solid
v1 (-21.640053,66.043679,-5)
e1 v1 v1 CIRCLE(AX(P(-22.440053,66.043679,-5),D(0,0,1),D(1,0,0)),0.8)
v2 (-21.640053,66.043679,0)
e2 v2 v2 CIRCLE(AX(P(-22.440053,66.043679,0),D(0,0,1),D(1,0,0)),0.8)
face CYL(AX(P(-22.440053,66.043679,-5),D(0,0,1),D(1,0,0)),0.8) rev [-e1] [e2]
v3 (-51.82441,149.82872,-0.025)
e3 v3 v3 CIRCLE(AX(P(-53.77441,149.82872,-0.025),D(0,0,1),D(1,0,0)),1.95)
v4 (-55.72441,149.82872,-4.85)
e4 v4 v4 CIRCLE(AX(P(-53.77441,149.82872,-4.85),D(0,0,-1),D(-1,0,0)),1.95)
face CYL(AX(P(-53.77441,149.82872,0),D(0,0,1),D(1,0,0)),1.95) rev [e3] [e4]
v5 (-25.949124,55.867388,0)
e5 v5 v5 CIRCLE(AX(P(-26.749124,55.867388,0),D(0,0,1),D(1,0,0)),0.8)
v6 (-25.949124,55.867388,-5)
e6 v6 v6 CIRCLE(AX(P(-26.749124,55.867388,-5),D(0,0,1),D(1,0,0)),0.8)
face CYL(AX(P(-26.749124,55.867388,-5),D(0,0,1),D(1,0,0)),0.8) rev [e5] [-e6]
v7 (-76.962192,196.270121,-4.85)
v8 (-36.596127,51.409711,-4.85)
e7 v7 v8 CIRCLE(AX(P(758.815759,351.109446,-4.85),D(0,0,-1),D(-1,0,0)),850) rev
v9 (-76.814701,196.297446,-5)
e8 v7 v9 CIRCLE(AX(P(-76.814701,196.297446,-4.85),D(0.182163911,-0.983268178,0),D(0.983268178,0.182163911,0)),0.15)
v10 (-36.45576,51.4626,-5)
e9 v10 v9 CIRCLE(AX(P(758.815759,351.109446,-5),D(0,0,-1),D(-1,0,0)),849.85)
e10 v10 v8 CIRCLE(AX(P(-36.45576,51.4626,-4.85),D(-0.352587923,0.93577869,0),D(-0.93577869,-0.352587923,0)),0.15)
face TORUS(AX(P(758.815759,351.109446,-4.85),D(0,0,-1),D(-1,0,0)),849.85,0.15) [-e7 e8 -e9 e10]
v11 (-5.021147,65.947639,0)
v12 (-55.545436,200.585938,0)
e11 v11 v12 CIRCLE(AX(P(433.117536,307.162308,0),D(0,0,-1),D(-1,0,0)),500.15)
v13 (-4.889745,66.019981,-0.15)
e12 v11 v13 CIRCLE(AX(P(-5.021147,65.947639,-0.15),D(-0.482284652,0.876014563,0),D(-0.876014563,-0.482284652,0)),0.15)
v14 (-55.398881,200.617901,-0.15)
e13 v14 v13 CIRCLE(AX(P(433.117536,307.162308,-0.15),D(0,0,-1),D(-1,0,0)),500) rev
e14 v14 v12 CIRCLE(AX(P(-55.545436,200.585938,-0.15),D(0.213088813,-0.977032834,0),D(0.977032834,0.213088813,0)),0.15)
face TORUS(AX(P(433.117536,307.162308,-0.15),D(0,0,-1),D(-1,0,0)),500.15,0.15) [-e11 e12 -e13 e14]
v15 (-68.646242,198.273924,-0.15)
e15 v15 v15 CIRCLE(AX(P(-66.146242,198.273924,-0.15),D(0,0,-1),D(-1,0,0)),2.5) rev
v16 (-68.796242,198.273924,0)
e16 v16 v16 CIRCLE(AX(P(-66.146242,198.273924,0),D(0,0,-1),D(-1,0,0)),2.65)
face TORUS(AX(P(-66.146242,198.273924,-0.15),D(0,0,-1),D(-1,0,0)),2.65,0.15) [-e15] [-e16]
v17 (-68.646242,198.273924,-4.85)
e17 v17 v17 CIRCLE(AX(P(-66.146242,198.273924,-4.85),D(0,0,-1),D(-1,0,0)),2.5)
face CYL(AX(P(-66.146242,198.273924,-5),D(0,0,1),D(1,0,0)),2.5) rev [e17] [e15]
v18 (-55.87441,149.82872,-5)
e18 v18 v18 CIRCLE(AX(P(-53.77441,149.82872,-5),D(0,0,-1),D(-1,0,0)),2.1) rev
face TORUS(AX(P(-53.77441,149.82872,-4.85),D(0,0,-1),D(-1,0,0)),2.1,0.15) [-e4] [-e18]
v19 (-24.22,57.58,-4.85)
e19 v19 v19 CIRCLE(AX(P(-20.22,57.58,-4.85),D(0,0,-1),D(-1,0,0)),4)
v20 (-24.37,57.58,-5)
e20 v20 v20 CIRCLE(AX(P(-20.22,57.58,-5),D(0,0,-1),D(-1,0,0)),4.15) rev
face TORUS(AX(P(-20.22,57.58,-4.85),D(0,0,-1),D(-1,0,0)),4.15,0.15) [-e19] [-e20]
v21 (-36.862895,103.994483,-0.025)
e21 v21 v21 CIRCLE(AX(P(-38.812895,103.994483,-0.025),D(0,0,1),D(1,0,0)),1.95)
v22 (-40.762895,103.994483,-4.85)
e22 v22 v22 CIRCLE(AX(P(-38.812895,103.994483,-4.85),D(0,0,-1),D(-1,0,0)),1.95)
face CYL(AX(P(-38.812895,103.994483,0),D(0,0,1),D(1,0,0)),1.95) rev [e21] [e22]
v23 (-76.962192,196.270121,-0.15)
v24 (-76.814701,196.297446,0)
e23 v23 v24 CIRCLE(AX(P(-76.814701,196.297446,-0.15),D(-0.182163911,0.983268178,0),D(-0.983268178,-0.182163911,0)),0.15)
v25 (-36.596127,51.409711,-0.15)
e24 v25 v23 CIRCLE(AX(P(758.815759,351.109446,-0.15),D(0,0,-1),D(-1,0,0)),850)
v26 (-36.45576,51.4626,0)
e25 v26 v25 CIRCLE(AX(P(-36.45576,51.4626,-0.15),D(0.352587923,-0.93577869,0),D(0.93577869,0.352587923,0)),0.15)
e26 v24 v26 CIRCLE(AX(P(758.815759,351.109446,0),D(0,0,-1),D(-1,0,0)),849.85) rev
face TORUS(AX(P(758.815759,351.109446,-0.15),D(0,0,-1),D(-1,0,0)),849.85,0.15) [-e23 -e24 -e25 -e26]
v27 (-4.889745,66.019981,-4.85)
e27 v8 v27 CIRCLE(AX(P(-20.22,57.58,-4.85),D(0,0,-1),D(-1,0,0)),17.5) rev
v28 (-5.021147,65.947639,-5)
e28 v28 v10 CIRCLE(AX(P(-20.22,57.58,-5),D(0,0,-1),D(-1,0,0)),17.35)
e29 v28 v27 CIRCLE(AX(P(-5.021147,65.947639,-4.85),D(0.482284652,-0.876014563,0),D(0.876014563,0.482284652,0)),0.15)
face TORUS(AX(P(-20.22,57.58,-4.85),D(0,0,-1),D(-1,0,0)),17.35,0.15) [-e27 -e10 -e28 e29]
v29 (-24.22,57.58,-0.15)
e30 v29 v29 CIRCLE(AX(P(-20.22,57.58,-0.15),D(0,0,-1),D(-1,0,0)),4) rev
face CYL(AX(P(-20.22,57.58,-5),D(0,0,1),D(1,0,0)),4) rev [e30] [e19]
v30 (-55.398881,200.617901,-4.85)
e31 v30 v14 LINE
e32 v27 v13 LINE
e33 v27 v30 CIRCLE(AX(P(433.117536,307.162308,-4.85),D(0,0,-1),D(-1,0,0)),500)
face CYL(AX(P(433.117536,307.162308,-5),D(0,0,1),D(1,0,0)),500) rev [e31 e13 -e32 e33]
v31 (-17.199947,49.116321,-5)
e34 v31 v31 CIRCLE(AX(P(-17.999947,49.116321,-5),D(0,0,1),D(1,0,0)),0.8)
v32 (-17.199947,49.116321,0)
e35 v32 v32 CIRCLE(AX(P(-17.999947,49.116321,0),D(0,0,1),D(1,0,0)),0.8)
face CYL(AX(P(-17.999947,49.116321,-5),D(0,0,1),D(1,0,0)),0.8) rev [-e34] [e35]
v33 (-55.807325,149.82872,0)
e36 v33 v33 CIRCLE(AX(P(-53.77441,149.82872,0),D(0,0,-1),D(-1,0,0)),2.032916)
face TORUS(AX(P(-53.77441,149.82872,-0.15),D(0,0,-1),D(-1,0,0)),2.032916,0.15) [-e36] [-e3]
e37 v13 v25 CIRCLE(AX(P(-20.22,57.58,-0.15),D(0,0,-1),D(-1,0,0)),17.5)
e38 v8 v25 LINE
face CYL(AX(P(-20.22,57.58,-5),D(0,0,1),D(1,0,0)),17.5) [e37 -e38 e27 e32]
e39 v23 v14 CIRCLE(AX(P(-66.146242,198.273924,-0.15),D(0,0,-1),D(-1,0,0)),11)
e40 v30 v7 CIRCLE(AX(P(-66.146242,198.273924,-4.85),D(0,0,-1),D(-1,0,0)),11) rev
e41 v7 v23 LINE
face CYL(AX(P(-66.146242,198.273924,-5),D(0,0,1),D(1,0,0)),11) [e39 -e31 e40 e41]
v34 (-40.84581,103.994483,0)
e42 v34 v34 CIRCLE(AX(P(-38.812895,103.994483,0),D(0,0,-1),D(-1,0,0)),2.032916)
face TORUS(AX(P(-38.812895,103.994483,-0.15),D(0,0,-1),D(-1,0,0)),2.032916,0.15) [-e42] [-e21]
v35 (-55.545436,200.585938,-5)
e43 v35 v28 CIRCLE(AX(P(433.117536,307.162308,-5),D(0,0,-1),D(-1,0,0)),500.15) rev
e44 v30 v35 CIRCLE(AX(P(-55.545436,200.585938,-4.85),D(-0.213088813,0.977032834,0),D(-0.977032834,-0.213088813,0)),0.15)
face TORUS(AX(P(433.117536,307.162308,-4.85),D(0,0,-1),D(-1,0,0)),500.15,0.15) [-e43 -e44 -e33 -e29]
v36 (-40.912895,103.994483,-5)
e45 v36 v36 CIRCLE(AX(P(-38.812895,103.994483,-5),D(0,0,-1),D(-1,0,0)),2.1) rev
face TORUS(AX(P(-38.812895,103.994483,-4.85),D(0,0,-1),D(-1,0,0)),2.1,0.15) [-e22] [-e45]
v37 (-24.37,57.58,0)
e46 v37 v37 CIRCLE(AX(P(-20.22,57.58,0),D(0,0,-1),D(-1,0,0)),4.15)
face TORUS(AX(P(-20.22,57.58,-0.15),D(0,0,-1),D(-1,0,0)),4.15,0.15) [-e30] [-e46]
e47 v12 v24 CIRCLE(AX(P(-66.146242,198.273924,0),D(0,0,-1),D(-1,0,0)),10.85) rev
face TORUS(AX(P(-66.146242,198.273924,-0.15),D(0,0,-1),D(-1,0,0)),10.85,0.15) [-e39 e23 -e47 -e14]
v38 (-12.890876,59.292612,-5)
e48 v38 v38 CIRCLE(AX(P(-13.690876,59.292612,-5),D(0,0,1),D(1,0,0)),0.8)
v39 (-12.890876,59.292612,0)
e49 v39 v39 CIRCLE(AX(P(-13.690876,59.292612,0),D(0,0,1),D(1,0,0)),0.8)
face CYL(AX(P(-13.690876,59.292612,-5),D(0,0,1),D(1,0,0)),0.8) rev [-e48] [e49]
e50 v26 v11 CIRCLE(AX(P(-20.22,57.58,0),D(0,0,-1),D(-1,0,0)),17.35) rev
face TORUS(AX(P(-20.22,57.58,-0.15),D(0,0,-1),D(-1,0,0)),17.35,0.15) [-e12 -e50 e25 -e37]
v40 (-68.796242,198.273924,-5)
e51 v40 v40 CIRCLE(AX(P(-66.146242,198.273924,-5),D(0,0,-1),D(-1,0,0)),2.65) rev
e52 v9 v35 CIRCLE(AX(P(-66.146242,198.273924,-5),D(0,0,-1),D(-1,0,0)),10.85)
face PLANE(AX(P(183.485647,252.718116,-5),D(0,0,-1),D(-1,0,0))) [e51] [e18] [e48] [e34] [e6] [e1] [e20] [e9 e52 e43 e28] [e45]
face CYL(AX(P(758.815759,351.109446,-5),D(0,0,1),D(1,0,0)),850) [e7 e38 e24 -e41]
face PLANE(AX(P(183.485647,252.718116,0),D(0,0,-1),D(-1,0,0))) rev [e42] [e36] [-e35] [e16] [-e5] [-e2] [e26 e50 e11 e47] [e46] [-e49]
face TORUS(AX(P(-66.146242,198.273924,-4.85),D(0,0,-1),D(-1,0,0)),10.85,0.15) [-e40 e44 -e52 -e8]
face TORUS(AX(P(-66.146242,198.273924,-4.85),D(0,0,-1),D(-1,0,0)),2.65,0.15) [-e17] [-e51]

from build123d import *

# Parameters (mm, degrees)
SKETCH1_R                        = 2.5
SKETCH1_R_2                      = 4
BOSS_EXTRUDE1_DEPTH              = 5
M3_5_CLEARANCE_HOLE1_D           = 3.9
M3_5_CLEARANCE_HOLE1_DEPTH       = 10
M3_5_CLEARANCE_HOLE1_CSINK_D     = 3.95
M3_5_CLEARANCE_HOLE1_CSINK_ANGLE = 90
M3_5_CLEARANCE_HOLE1_TIP         = 1.171678207
FILLET1_R                        = 0.15
SKETCH6_R                        = 0.8
CUT_EXTRUDE1_DEPTH               = 224.096656241


with BuildPart() as part:
    # Sketch1 → Boss-Extrude1 (new body)
    with BuildSketch(Plane.XY):
        with BuildLine():
            ThreePointArc((-55.398880578, 200.617901185), (-35.007116858, 131.494128363), (-4.889745153, 66.019981417))
            ThreePointArc((-4.889745153, 66.019981417), (-12.896171763, 41.686242107), (-36.596127074, 51.409711349))
            ThreePointArc((-36.596127074, 51.409711349), (-59.988982978, 122.945483177), (-76.962191703, 196.270121219))
            ThreePointArc((-76.962191703, 196.270121219), (-68.320402221, 209.056921333), (-55.398880578, 200.617901185))
        make_face()
        with Locations((-66.146241747, 198.273924243)):
            Circle(SKETCH1_R, mode=Mode.SUBTRACT)
        with Locations((-20.22, 57.58)):
            Circle(SKETCH1_R_2, mode=Mode.SUBTRACT)
    extrude(amount=-BOSS_EXTRUDE1_DEPTH)

    # M3.5 Clearance Hole1
    with Locations(Plane.XY):
        with Locations((-53.774409594, 149.828720465), (-38.812894637, 103.994483397)):
            CounterSinkHole(M3_5_CLEARANCE_HOLE1_D / 2, M3_5_CLEARANCE_HOLE1_CSINK_D / 2, depth=M3_5_CLEARANCE_HOLE1_DEPTH, counter_sink_angle=M3_5_CLEARANCE_HOLE1_CSINK_ANGLE)
            with Locations((0, 0, -(M3_5_CLEARANCE_HOLE1_DEPTH + M3_5_CLEARANCE_HOLE1_TIP / 2))):  # 118° drill point
                Cone(0, M3_5_CLEARANCE_HOLE1_D / 2, M3_5_CLEARANCE_HOLE1_TIP, mode=Mode.SUBTRACT)

    # Fillet1
    # the kernel refuses this fillet: 0.15 mm, written as the material it takes off along each edge
    with BuildSketch(Plane(origin=(-66.146241747, 198.273924243, -5), x_dir=(1, 0, 0), z_dir=(0, -1, 0))) as fillet1_piece_1:
        with BuildLine():
            CenterArc((2.5 + FILLET1_R, FILLET1_R), FILLET1_R, 180, 90)
            Line((2.5, FILLET1_R), (2.5 - FILLET1_R * 0.02, FILLET1_R))
            Line((2.5 - FILLET1_R * 0.02, FILLET1_R), (2.5 - FILLET1_R * 0.02, -FILLET1_R * 0.02))
            Line((2.5 - FILLET1_R * 0.02, -FILLET1_R * 0.02), (2.5 + FILLET1_R, -FILLET1_R * 0.02))
            Line((2.5 + FILLET1_R, -FILLET1_R * 0.02), (2.5 + FILLET1_R, 0))
        make_face()
    revolve(axis=Axis((-66.146241747, 198.273924243, -5), (0, 0, 1)), mode=Mode.SUBTRACT)
    with BuildSketch(Plane(origin=(-66.146241747, 198.273924243, 0), x_dir=(1, 0, 0), z_dir=(0, -1, 0))) as fillet1_piece_2:
        with BuildLine():
            CenterArc((2.5 + FILLET1_R, -FILLET1_R), FILLET1_R, 90, 90)
            Line((2.5 + FILLET1_R, 0), (2.5 + FILLET1_R, FILLET1_R * 0.02))
            Line((2.5 + FILLET1_R, FILLET1_R * 0.02), (2.5 - FILLET1_R * 0.02, FILLET1_R * 0.02))
            Line((2.5 - FILLET1_R * 0.02, FILLET1_R * 0.02), (2.5 - FILLET1_R * 0.02, -FILLET1_R))
            Line((2.5 - FILLET1_R * 0.02, -FILLET1_R), (2.5, -FILLET1_R))
        make_face()
    revolve(axis=Axis((-66.146241747, 198.273924243, 0), (0, 0, 1)), mode=Mode.SUBTRACT)
    with BuildSketch(Plane(origin=(-20.22, 57.58, -5), x_dir=(0.8760145626973271, 0.4822846524016815, 0), z_dir=(-0.4822846524016815, 0.8760145626973271, 0))) as fillet1_piece_3:
        with BuildLine():
            CenterArc((17.5 - FILLET1_R, -FILLET1_R), FILLET1_R, 0, 90)
            Line((17.5, -FILLET1_R), (17.5 + FILLET1_R * 0.02, -FILLET1_R))
            Line((17.5 + FILLET1_R * 0.02, -FILLET1_R), (17.5 + FILLET1_R * 0.02, FILLET1_R * 0.02))
            Line((17.5 + FILLET1_R * 0.02, FILLET1_R * 0.02), (17.5 - FILLET1_R, FILLET1_R * 0.02))
            Line((17.5 - FILLET1_R, FILLET1_R * 0.02), (17.5 - FILLET1_R, 0))
        make_face()
    revolve(axis=Axis((-20.22, 57.58, -5), (0, 0, -1)), revolution_arc=188.189036898, mode=Mode.SUBTRACT)
    with BuildSketch(Plane(origin=(-20.22, 57.58, -5), x_dir=(1, 0, 0), z_dir=(0, -1, 0))) as fillet1_piece_4:
        with BuildLine():
            CenterArc((4 + FILLET1_R, FILLET1_R), FILLET1_R, 180, 90)
            Line((4, FILLET1_R), (4 - FILLET1_R * 0.02, FILLET1_R))
            Line((4 - FILLET1_R * 0.02, FILLET1_R), (4 - FILLET1_R * 0.02, -FILLET1_R * 0.02))
            Line((4 - FILLET1_R * 0.02, -FILLET1_R * 0.02), (4 + FILLET1_R, -FILLET1_R * 0.02))
            Line((4 + FILLET1_R, -FILLET1_R * 0.02), (4 + FILLET1_R, 0))
        make_face()
    revolve(axis=Axis((-20.22, 57.58, -5), (0, 0, 1)), mode=Mode.SUBTRACT)
    with BuildSketch(Plane(origin=(-20.22, 57.58, 0), x_dir=(1, 0, 0), z_dir=(0, -1, 0))) as fillet1_piece_5:
        with BuildLine():
            CenterArc((4 + FILLET1_R, -FILLET1_R), FILLET1_R, 90, 90)
            Line((4 + FILLET1_R, 0), (4 + FILLET1_R, FILLET1_R * 0.02))
            Line((4 + FILLET1_R, FILLET1_R * 0.02), (4 - FILLET1_R * 0.02, FILLET1_R * 0.02))
            Line((4 - FILLET1_R * 0.02, FILLET1_R * 0.02), (4 - FILLET1_R * 0.02, -FILLET1_R))
            Line((4 - FILLET1_R * 0.02, -FILLET1_R), (4, -FILLET1_R))
        make_face()
    revolve(axis=Axis((-20.22, 57.58, 0), (0, 0, 1)), mode=Mode.SUBTRACT)
    with BuildSketch(Plane(origin=(433.117536196, 307.162307618, -5), x_dir=(-0.9770328335482352, -0.21308881286615342, 0), z_dir=(-0.21308881286615342, 0.9770328335482352, 0))) as fillet1_piece_6:
        with BuildLine():
            CenterArc((500 + FILLET1_R, FILLET1_R), FILLET1_R, 180, 90)
            Line((500, FILLET1_R), (500 - FILLET1_R * 0.0200000000003, FILLET1_R))
            Line((500 - FILLET1_R * 0.0200000000003, FILLET1_R), (500 - FILLET1_R * 0.0200000000003, -FILLET1_R * 0.02))
            Line((500 - FILLET1_R * 0.0200000000003, -FILLET1_R * 0.02), (500 + FILLET1_R, -FILLET1_R * 0.02))
            Line((500 + FILLET1_R, -FILLET1_R * 0.02), (500 + FILLET1_R, 0))
        make_face()
    revolve(axis=Axis((433.117536196, 307.162307618, -5), (0, 0, 1)), revolution_arc=16.531296607, mode=Mode.SUBTRACT)
    with BuildSketch(Plane(origin=(-38.812894637, 103.994483397, -5), x_dir=(-1, 0, 0), z_dir=(0, -1, 0))) as fillet1_piece_7:
        with BuildLine():
            CenterArc((1.95 + FILLET1_R, -FILLET1_R), FILLET1_R, 90, 90)
            Line((1.95, -FILLET1_R), (1.95 - FILLET1_R * 0.02, -FILLET1_R))
            Line((1.95 - FILLET1_R * 0.02, -FILLET1_R), (1.95 - FILLET1_R * 0.02, FILLET1_R * 0.02))
            Line((1.95 - FILLET1_R * 0.02, FILLET1_R * 0.02), (1.95 + FILLET1_R, FILLET1_R * 0.02))
            Line((1.95 + FILLET1_R, FILLET1_R * 0.02), (1.95 + FILLET1_R, 0))
        make_face()
    revolve(axis=Axis((-38.812894637, 103.994483397, -5), (0, 0, -1)), mode=Mode.SUBTRACT)
    with BuildSketch(Plane(origin=(-38.812894637, 103.994483397, 0), x_dir=(-1, 0, 0), z_dir=(0, -1, 0))) as fillet1_piece_8:
        with BuildLine():
            CenterArc((2.03291562, 0.15), FILLET1_R, 236.442690238, 33.557309762)
            Line((2.03291562, 0), (2.03291562, -0.003))
            Line((2.03291562, -0.003), (1.975, -0.003))
            Line((1.975, -0.003), (1.97287868, -0.00212132))
            ThreePointArc((1.97287868, -0.00212132), (1.96037868, 0.01037868), (1.948341688, 0.0225))
            Line((1.948341688, 0.0225), (1.95, 0.025))
        make_face()
    revolve(axis=Axis((-38.812894637, 103.994483397, 0), (0, 0, -1)), mode=Mode.SUBTRACT)
    with BuildSketch(Plane(origin=(-53.774409594, 149.828720465, -5), x_dir=(-1, 0, 0), z_dir=(0, -1, 0))) as fillet1_piece_9:
        with BuildLine():
            CenterArc((1.95 + FILLET1_R, -FILLET1_R), FILLET1_R, 90, 90)
            Line((1.95, -FILLET1_R), (1.95 - FILLET1_R * 0.02, -FILLET1_R))
            Line((1.95 - FILLET1_R * 0.02, -FILLET1_R), (1.95 - FILLET1_R * 0.02, FILLET1_R * 0.02))
            Line((1.95 - FILLET1_R * 0.02, FILLET1_R * 0.02), (1.95 + FILLET1_R, FILLET1_R * 0.02))
            Line((1.95 + FILLET1_R, FILLET1_R * 0.02), (1.95 + FILLET1_R, 0))
        make_face()
    revolve(axis=Axis((-53.774409594, 149.828720465, -5), (0, 0, -1)), mode=Mode.SUBTRACT)
    with BuildSketch(Plane(origin=(-53.774409594, 149.828720465, 0), x_dir=(-1, 0, 0), z_dir=(0, -1, 0))) as fillet1_piece_10:
        with BuildLine():
            CenterArc((2.03291562, 0.15), FILLET1_R, 236.442690238, 33.557309762)
            Line((2.03291562, 0), (2.03291562, -0.003))
            Line((2.03291562, -0.003), (1.975, -0.003))
            Line((1.975, -0.003), (1.97287868, -0.00212132))
            ThreePointArc((1.97287868, -0.00212132), (1.96037868, 0.01037868), (1.948341688, 0.0225))
            Line((1.948341688, 0.0225), (1.95, 0.025))
        make_face()
    revolve(axis=Axis((-53.774409594, 149.828720465, 0), (0, 0, -1)), mode=Mode.SUBTRACT)
    with BuildSketch(Plane(origin=(-66.146241747, 198.273924243, -5), x_dir=(-0.9832681777691128, -0.18216391131782472, 0), z_dir=(0.18216391131782472, -0.9832681777691128, 0))) as fillet1_piece_11:
        with BuildLine():
            CenterArc((11 - FILLET1_R, -FILLET1_R), FILLET1_R, 0, 90)
            Line((11 - FILLET1_R, 0), (11 - FILLET1_R, FILLET1_R * 0.02))
            Line((11 - FILLET1_R, FILLET1_R * 0.02), (11 + FILLET1_R * 0.02, FILLET1_R * 0.02))
            Line((11 + FILLET1_R * 0.02, FILLET1_R * 0.02), (11 + FILLET1_R * 0.02, -FILLET1_R))
            Line((11 + FILLET1_R * 0.02, -FILLET1_R), (11, -FILLET1_R))
        make_face()
    revolve(axis=Axis((-66.146241747, 198.273924243, -5), (0, 0, -1)), revolution_arc=178.192400693, mode=Mode.SUBTRACT)
    with BuildSketch(Plane(origin=(433.117536196, 307.162307618, 0), x_dir=(-0.9770328335482352, -0.21308881286615342, 0), z_dir=(-0.21308881286615342, 0.9770328335482352, 0))) as fillet1_piece_12:
        with BuildLine():
            CenterArc((500 + FILLET1_R, -FILLET1_R), FILLET1_R, 90, 90)
            Line((500, -FILLET1_R), (500 - FILLET1_R * 0.0200000000003, -FILLET1_R))
            Line((500 - FILLET1_R * 0.0200000000003, -FILLET1_R), (500 - FILLET1_R * 0.0200000000003, FILLET1_R * 0.02))
            Line((500 - FILLET1_R * 0.0200000000003, FILLET1_R * 0.02), (500 + FILLET1_R, FILLET1_R * 0.02))
            Line((500 + FILLET1_R, FILLET1_R * 0.02), (500 + FILLET1_R, 0))
        make_face()
    revolve(axis=Axis((433.117536196, 307.162307618, 0), (0, 0, 1)), revolution_arc=16.531296607, mode=Mode.SUBTRACT)
    with BuildSketch(Plane(origin=(-20.22, 57.58, 0), x_dir=(0.8760145626973271, 0.4822846524016815, 0), z_dir=(-0.4822846524016815, 0.8760145626973271, 0))) as fillet1_piece_13:
        with BuildLine():
            CenterArc((17.5 - FILLET1_R, FILLET1_R), FILLET1_R, 270, 90)
            Line((17.5 - FILLET1_R, 0), (17.5 - FILLET1_R, -FILLET1_R * 0.02))
            Line((17.5 - FILLET1_R, -FILLET1_R * 0.02), (17.5 + FILLET1_R * 0.02, -FILLET1_R * 0.02))
            Line((17.5 + FILLET1_R * 0.02, -FILLET1_R * 0.02), (17.5 + FILLET1_R * 0.02, FILLET1_R))
            Line((17.5 + FILLET1_R * 0.02, FILLET1_R), (17.5, FILLET1_R))
        make_face()
    revolve(axis=Axis((-20.22, 57.58, 0), (0, 0, -1)), revolution_arc=188.189036898, mode=Mode.SUBTRACT)
    with BuildSketch(Plane(origin=(758.815759401, 351.109445839, 0), x_dir=(-0.9357786899711781, -0.3525879229296231, 0), z_dir=(0.3525879229296231, -0.9357786899711781, 0))) as fillet1_piece_14:
        with BuildLine():
            CenterArc((850 - FILLET1_R, FILLET1_R), FILLET1_R, 270, 90)
            Line((850, FILLET1_R), (850 + FILLET1_R * 0.020000000001, FILLET1_R))
            Line((850 + FILLET1_R * 0.020000000001, FILLET1_R), (850 + FILLET1_R * 0.020000000001, -FILLET1_R * 0.02))
            Line((850 + FILLET1_R * 0.020000000001, -FILLET1_R * 0.02), (850 - FILLET1_R, -FILLET1_R * 0.02))
            Line((850 - FILLET1_R, -FILLET1_R * 0.02), (850 - FILLET1_R, 0))
        make_face()
    revolve(axis=Axis((758.815759401, 351.109445839, 0), (0, 0, -1)), revolution_arc=10.149859016, mode=Mode.SUBTRACT)
    with BuildSketch(Plane(origin=(-66.146241747, 198.273924243, 0), x_dir=(-0.9832681777691128, -0.18216391131782472, 0), z_dir=(0.18216391131782472, -0.9832681777691128, 0))) as fillet1_piece_15:
        with BuildLine():
            CenterArc((11 - FILLET1_R, FILLET1_R), FILLET1_R, 270, 90)
            Line((11 - FILLET1_R, 0), (11 - FILLET1_R, -FILLET1_R * 0.02))
            Line((11 - FILLET1_R, -FILLET1_R * 0.02), (11 + FILLET1_R * 0.02, -FILLET1_R * 0.02))
            Line((11 + FILLET1_R * 0.02, -FILLET1_R * 0.02), (11 + FILLET1_R * 0.02, FILLET1_R))
            Line((11 + FILLET1_R * 0.02, FILLET1_R), (11, FILLET1_R))
        make_face()
    revolve(axis=Axis((-66.146241747, 198.273924243, 0), (0, 0, -1)), revolution_arc=178.192400693, mode=Mode.SUBTRACT)
    with BuildSketch(Plane(origin=(758.815759401, 351.109445839, -5), x_dir=(-0.9357786899711781, -0.3525879229296231, 0), z_dir=(0.3525879229296231, -0.9357786899711781, 0))) as fillet1_piece_16:
        with BuildLine():
            CenterArc((850 - FILLET1_R, -FILLET1_R), FILLET1_R, 0, 90)
            Line((850, -FILLET1_R), (850 + FILLET1_R * 0.020000000001, -FILLET1_R))
            Line((850 + FILLET1_R * 0.020000000001, -FILLET1_R), (850 + FILLET1_R * 0.020000000001, FILLET1_R * 0.02))
            Line((850 + FILLET1_R * 0.020000000001, FILLET1_R * 0.02), (850 - FILLET1_R, FILLET1_R * 0.02))
            Line((850 - FILLET1_R, FILLET1_R * 0.02), (850 - FILLET1_R, 0))
        make_face()
    revolve(axis=Axis((758.815759401, 351.109445839, -5), (0, 0, -1)), revolution_arc=10.149859016, mode=Mode.SUBTRACT)

    # Sketch6 → Cut-Extrude1 (cut, through all)
    with BuildSketch(Plane.XY):
        with Locations((-17.999947241, 49.116320791)):
            Circle(SKETCH6_R)
        with Locations((-13.690876039, 59.292612128)):
            Circle(SKETCH6_R)
        with Locations((-22.440052759, 66.043679209)):
            Circle(SKETCH6_R)
        with Locations((-26.749123961, 55.867387872)):
            Circle(SKETCH6_R)
    extrude(amount=-CUT_EXTRUDE1_DEPTH, mode=Mode.SUBTRACT)


solid = part.part
